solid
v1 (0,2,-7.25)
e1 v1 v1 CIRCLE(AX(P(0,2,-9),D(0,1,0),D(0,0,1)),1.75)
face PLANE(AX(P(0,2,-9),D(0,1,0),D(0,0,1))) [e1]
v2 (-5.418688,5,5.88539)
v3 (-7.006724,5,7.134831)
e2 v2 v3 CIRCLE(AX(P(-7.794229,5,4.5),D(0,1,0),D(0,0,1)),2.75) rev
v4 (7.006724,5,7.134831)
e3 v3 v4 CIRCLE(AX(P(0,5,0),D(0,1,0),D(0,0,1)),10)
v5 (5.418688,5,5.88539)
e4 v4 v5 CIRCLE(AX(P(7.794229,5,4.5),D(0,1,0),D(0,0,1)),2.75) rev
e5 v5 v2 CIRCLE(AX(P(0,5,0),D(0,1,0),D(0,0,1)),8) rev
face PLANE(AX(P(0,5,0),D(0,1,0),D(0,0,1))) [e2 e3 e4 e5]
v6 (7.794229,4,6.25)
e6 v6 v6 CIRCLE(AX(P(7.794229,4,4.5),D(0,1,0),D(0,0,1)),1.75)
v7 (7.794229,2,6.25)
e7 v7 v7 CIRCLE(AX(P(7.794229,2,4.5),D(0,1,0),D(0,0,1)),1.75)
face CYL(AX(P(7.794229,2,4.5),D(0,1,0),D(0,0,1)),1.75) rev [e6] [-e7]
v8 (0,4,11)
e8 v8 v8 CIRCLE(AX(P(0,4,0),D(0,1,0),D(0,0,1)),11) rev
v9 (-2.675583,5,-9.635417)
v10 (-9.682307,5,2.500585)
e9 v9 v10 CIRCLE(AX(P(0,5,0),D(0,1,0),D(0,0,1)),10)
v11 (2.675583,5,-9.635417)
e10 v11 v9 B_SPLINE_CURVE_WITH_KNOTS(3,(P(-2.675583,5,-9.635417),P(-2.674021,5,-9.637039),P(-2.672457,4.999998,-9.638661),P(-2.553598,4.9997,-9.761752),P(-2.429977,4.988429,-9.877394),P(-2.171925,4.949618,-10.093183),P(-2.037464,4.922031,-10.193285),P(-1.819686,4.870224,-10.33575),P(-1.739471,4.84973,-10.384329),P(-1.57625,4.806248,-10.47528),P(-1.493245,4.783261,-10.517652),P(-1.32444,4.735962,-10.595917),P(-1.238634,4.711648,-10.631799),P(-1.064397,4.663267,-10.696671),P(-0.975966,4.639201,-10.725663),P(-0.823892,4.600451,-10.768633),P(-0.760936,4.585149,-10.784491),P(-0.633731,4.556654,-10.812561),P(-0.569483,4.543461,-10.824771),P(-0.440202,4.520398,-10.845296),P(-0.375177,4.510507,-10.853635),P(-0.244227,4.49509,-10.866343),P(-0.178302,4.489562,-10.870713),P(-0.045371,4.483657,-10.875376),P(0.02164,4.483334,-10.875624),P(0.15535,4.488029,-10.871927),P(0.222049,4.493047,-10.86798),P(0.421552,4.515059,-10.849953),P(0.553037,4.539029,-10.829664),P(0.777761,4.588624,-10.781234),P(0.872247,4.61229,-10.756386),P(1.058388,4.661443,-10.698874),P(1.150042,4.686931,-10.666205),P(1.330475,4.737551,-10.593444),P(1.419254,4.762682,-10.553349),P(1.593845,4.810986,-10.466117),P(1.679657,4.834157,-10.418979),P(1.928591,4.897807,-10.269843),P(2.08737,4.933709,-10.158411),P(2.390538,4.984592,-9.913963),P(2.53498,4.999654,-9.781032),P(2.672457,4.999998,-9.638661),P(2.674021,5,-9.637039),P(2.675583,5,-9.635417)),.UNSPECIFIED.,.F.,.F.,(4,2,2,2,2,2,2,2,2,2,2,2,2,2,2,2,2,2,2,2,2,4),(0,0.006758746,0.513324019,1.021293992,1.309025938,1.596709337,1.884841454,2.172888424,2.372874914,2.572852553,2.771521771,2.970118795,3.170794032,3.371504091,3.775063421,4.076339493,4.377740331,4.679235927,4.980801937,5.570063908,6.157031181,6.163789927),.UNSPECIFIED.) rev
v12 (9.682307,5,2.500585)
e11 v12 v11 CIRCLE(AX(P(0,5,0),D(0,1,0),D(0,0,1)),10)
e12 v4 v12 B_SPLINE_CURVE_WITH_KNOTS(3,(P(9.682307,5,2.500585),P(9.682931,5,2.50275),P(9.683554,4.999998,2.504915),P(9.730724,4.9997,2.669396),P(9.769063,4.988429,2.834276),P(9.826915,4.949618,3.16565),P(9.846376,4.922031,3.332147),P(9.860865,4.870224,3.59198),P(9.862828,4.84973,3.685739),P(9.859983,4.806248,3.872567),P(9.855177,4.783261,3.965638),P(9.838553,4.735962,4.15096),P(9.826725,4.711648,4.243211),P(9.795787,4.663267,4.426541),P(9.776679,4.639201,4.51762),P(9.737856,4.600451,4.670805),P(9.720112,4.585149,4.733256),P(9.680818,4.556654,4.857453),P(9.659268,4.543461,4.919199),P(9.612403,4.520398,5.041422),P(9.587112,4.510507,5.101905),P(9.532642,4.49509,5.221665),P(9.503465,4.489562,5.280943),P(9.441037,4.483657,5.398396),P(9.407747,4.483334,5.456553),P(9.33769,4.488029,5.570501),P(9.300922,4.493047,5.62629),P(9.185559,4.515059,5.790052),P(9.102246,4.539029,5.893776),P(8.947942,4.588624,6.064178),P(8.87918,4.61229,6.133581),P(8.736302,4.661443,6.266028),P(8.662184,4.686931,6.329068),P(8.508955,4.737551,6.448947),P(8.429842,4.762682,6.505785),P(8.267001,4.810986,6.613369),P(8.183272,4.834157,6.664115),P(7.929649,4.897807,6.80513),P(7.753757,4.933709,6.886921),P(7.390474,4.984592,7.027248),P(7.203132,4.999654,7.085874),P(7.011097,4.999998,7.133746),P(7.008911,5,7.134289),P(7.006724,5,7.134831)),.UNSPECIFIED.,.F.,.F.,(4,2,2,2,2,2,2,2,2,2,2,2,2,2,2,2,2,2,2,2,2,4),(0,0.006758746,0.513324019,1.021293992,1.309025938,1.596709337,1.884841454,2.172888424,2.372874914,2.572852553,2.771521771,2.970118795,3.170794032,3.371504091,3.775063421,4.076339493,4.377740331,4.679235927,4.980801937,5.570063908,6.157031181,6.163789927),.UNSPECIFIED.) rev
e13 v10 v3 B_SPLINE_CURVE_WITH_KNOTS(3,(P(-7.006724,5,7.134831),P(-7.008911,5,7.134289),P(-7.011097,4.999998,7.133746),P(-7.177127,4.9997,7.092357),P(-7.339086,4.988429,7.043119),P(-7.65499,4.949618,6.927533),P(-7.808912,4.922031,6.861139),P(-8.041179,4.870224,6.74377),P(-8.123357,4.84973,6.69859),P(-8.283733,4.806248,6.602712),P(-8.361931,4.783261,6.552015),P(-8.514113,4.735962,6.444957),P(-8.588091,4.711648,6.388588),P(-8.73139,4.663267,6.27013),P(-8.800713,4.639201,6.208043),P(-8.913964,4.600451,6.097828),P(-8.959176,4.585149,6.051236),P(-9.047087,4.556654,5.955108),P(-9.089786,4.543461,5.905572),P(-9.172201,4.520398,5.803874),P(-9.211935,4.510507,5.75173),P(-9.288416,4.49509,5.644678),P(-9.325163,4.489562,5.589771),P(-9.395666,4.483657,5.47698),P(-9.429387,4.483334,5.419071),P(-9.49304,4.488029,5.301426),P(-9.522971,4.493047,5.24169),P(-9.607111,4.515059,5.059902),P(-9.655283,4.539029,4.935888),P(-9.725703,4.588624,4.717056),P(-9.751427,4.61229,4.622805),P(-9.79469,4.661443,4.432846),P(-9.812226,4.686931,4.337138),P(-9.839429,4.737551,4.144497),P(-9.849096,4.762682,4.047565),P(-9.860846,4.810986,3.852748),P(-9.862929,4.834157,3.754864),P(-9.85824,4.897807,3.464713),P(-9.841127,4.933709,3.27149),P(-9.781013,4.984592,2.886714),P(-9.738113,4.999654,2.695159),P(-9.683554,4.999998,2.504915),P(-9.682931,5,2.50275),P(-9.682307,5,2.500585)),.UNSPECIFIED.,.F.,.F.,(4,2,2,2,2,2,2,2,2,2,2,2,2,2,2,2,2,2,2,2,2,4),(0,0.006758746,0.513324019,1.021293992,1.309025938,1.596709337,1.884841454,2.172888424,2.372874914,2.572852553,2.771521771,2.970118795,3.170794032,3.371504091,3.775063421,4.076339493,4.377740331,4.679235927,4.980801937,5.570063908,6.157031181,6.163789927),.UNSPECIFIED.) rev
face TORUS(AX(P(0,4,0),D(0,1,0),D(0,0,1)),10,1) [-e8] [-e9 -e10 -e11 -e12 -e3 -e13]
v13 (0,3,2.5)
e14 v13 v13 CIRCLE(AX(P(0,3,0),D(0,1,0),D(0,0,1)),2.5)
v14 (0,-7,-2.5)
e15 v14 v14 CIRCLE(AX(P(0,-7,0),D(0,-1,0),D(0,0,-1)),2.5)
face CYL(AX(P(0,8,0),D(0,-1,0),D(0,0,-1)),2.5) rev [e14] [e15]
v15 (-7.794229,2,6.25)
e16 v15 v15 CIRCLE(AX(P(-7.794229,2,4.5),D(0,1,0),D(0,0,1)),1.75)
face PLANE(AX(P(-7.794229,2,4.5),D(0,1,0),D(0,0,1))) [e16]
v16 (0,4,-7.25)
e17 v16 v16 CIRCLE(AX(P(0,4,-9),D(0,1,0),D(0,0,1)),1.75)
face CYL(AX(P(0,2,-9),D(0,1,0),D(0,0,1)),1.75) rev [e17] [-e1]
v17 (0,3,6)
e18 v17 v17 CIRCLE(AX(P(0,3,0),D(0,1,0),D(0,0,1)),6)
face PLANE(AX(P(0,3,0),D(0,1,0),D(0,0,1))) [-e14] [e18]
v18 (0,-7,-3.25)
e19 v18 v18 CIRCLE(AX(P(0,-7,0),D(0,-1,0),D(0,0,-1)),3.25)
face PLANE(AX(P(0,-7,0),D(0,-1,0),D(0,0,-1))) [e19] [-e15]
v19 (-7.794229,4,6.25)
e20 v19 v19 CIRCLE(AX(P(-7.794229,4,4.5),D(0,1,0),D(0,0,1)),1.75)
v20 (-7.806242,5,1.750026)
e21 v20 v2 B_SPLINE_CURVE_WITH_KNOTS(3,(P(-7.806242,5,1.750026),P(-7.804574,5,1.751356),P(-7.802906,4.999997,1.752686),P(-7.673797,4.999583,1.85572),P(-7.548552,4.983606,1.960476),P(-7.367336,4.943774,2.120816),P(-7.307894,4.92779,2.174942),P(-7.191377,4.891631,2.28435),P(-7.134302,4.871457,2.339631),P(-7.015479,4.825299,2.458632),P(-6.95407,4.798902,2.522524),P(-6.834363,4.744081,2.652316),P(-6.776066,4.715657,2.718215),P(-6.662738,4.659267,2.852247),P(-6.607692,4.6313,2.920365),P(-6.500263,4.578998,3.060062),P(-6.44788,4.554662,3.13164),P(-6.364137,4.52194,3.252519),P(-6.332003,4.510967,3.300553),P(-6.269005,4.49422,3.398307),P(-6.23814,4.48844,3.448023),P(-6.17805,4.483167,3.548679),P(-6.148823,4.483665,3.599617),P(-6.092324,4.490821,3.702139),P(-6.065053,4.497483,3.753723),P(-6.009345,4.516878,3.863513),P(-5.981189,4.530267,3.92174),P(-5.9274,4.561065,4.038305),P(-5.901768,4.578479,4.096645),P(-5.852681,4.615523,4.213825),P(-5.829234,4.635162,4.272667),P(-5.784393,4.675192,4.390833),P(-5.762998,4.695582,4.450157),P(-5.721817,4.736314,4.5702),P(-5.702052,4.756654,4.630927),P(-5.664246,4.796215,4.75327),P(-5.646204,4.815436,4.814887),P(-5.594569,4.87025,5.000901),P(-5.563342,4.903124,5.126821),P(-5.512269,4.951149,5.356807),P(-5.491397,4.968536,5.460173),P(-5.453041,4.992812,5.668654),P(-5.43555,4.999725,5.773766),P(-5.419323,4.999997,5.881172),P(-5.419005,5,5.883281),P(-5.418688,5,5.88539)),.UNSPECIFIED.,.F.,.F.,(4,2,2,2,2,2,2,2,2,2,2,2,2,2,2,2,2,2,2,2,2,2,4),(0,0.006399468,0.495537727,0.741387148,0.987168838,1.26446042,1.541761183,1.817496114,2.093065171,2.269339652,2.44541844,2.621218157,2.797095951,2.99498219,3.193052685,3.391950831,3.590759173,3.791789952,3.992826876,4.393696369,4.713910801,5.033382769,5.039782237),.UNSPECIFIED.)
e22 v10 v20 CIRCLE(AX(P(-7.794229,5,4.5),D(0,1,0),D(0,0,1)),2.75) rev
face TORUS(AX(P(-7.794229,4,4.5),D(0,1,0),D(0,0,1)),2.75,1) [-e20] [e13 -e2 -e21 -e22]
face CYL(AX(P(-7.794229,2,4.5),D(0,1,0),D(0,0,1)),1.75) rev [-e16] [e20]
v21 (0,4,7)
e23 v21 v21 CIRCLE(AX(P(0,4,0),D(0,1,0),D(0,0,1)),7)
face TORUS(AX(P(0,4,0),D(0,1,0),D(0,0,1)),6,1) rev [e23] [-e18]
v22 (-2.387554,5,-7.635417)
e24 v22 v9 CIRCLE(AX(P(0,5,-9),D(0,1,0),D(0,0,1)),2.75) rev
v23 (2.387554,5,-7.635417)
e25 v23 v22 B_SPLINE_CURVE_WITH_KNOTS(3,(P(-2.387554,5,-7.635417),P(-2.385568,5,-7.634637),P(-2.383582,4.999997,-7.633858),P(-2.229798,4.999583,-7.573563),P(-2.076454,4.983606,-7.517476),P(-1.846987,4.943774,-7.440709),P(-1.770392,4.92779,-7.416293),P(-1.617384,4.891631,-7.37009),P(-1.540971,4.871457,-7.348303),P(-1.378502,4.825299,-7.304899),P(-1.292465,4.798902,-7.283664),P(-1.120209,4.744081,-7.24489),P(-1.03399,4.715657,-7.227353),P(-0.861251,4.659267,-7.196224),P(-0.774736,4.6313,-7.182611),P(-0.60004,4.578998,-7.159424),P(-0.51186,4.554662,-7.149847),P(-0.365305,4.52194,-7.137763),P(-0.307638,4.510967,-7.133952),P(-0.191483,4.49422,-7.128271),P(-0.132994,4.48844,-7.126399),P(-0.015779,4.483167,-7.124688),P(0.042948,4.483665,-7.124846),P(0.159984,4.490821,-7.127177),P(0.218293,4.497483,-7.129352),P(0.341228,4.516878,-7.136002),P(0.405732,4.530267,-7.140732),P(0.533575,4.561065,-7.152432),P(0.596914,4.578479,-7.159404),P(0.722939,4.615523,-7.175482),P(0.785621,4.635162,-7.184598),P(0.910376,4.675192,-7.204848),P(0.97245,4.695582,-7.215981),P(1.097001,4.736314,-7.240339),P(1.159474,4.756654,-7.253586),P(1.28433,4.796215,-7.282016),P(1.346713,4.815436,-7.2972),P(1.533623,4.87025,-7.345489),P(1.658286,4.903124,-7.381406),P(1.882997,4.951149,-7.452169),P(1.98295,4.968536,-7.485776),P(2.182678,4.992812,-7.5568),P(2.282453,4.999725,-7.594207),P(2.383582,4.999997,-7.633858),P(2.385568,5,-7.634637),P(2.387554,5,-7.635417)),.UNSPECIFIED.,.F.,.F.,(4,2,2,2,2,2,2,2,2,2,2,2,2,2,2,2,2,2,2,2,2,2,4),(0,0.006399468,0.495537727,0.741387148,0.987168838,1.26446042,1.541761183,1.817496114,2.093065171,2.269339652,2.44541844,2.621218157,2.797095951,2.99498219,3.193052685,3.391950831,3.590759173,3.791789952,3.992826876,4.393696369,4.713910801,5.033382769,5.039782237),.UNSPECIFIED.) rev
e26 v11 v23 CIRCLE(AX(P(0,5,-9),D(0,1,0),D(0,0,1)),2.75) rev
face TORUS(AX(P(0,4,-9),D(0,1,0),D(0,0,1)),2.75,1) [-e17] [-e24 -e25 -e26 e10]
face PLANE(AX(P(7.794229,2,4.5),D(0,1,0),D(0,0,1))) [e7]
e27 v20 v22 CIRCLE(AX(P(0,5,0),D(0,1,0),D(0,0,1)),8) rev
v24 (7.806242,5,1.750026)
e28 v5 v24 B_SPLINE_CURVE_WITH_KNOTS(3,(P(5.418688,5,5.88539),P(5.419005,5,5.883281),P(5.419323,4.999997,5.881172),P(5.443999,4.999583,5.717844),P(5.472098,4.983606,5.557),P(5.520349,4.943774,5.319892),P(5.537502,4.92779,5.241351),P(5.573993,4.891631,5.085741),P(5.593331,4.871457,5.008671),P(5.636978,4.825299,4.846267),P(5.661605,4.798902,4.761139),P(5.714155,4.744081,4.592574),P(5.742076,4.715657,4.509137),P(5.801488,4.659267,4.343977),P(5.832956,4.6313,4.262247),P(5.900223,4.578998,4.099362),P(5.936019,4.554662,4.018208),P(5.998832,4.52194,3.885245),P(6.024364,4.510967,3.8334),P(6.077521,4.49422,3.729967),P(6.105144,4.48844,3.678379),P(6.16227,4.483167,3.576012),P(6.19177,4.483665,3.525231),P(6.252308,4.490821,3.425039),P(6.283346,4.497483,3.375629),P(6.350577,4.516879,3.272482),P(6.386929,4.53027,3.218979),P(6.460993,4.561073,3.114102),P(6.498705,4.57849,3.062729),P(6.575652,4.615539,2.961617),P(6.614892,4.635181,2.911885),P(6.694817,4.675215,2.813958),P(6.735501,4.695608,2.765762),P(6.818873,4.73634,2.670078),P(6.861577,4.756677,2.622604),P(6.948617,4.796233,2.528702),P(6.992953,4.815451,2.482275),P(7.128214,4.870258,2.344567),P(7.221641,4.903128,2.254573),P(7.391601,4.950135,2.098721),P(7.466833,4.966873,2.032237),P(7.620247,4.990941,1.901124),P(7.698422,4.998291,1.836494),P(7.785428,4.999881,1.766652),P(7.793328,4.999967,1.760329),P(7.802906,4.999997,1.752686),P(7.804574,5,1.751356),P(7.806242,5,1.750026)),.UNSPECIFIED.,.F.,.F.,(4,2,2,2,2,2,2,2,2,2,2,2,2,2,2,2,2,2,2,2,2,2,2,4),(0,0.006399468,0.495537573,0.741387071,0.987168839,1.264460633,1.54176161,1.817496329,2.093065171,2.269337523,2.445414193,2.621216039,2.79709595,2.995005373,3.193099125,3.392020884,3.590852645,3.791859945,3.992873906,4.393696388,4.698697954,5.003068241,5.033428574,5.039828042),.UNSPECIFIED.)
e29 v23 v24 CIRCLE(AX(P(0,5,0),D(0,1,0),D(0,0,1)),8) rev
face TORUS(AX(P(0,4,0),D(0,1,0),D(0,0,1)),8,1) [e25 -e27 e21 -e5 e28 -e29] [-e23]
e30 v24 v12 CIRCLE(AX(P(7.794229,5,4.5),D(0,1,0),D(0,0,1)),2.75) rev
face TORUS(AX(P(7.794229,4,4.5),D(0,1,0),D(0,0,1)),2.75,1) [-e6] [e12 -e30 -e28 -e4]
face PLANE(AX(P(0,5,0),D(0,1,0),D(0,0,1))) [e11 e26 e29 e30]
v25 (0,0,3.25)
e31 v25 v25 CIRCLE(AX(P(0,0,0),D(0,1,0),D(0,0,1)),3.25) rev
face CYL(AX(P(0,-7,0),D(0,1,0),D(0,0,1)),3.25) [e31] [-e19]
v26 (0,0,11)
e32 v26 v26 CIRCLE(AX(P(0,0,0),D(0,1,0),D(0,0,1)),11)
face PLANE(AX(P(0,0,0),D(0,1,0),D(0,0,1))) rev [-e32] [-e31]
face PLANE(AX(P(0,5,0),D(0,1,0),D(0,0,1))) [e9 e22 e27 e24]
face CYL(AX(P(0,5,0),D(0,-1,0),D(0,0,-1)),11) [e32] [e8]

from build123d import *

# Parameters (mm, degrees)
SKETCH1_R           = 11
BOSS_EXTRUDE1_DEPTH = 5
SKETCH2_R           = 1.75
CUT_EXTRUDE1_DEPTH  = 3
SKETCH3_R           = 7
CUT_EXTRUDE2_DEPTH  = 2
SKETCH4_R           = 3.25
BOSS_EXTRUDE3_DEPTH = 7
SKETCH5_R           = 2.5
CUT_EXTRUDE3_DEPTH  = 15
FILLET3_R           = 1


with BuildPart() as part:
    # Sketch1 → Boss-Extrude1 (new body)
    with BuildSketch(Plane(origin=(0, 0, 0), x_dir=(1, 0, 0), z_dir=(0, 1, 0))):
        with Locations(Location((0, 0, 0), (0, 0, 270))):
            Circle(SKETCH1_R)
    extrude(amount=BOSS_EXTRUDE1_DEPTH)

    # Sketch2 → Cut-Extrude1 (cut)
    with BuildSketch(Plane(origin=(0, 5, 0), x_dir=(1, 0, 0), z_dir=(0, 1, 0))):
        with Locations(Location((0, 9, 0), (0, 0, 270))):
            Circle(SKETCH2_R)
        with Locations(Location((7.794228634, -4.5, 0), (0, 0, 270))):
            Circle(SKETCH2_R)
        with Locations(Location((-7.794228634, -4.5, 0), (0, 0, 270))):
            Circle(SKETCH2_R)
    extrude(amount=-CUT_EXTRUDE1_DEPTH, mode=Mode.SUBTRACT)

    # Sketch3 → Cut-Extrude2 (cut)
    with BuildSketch(Plane(origin=(0, 5, 0), x_dir=(1, 0, 0), z_dir=(0, 1, 0))):
        with Locations(Location((0, 0, 0), (0, 0, 270))):
            Circle(SKETCH3_R)
    extrude(amount=-CUT_EXTRUDE2_DEPTH, mode=Mode.SUBTRACT)

    # Sketch4 → Boss-Extrude3 (add)
    with BuildSketch(Plane.XZ):
        with Locations(Location((0, 0, 0), (0, 0, 90))):
            Circle(SKETCH4_R)
    extrude(amount=BOSS_EXTRUDE3_DEPTH)

    # Sketch5 → Cut-Extrude3 (cut)
    with BuildSketch(Plane.XZ.offset(7)):
        with Locations(Location((0, 0, 0), (0, 0, 270))):
            Circle(SKETCH5_R)
    extrude(amount=-CUT_EXTRUDE3_DEPTH, mode=Mode.SUBTRACT)

    # Fillet3
    # the kernel refuses this fillet: 1 mm, written as the material it adds along each edge
    with BuildSketch(Plane(origin=(0, 3, 0), x_dir=(0, 0, 1), z_dir=(-1, 0, 0))) as fillet3_piece_1:
        with BuildLine():
            CenterArc((7 - FILLET3_R, FILLET3_R), FILLET3_R, 270, 90)
            Line((7 - FILLET3_R, 0), (7, 0))
            Line((7, 0), (7, FILLET3_R))
        make_face()
    revolve(axis=Axis((0, 3, 0), (0, 1, 0)))
    # the kernel refuses this fillet: 1 mm, written as the material it takes off along each edge
    with BuildSketch(Plane(origin=(-7.794228634, 5, 4.5), x_dir=(0, 0, 1), z_dir=(-1, 0, 0))) as fillet3_2_piece_1:
        with BuildLine():
            CenterArc((1.75 + FILLET3_R, -FILLET3_R), FILLET3_R, 90, 90)
            Line((1.75, -FILLET3_R), (1.75, 0))
            Line((1.75, 0), (1.75 + FILLET3_R, 0))
        make_face()
    revolve(axis=Axis((-7.794228634, 5, 4.5), (0, 1, 0)), mode=Mode.SUBTRACT)
    with BuildSketch(Plane(origin=(0, 5, 0), x_dir=(0, 0, 1), z_dir=(-1, 0, 0))) as fillet3_2_piece_2:
        with BuildLine():
            CenterArc((7 + FILLET3_R, -FILLET3_R), FILLET3_R, 90, 90)
            Line((7, -FILLET3_R), (7, 0))
            Line((7, 0), (7 + FILLET3_R, 0))
        make_face()
    revolve(axis=Axis((0, 5, 0), (0, 1, 0)), mode=Mode.SUBTRACT)
    with BuildSketch(Plane(origin=(0, 5, 0), x_dir=(0, 0, 1), z_dir=(-1, 0, 0))) as fillet3_2_piece_3:
        with BuildLine():
            CenterArc((11 - FILLET3_R, -FILLET3_R), FILLET3_R, 0, 90)
            Line((11 - FILLET3_R, 0), (11, 0))
            Line((11, 0), (11, -FILLET3_R))
        make_face()
    revolve(axis=Axis((0, 5, 0), (0, 1, 0)), mode=Mode.SUBTRACT)
    with BuildSketch(Plane(origin=(0, 5, -9), x_dir=(0, 0, 1), z_dir=(-1, 0, 0))) as fillet3_2_piece_4:
        with BuildLine():
            CenterArc((1.75 + FILLET3_R, -FILLET3_R), FILLET3_R, 90, 90)
            Line((1.75, -FILLET3_R), (1.75, 0))
            Line((1.75, 0), (1.75 + FILLET3_R, 0))
        make_face()
    revolve(axis=Axis((0, 5, -9), (0, 1, 0)), mode=Mode.SUBTRACT)
    with BuildSketch(Plane(origin=(7.794228634, 5, 4.5), x_dir=(0, 0, 1), z_dir=(-1, 0, 0))) as fillet3_2_piece_5:
        with BuildLine():
            CenterArc((1.75 + FILLET3_R, -FILLET3_R), FILLET3_R, 90, 90)
            Line((1.75, -FILLET3_R), (1.75, 0))
            Line((1.75, 0), (1.75 + FILLET3_R, 0))
        make_face()
    revolve(axis=Axis((7.794228634, 5, 4.5), (0, 1, 0)), mode=Mode.SUBTRACT)


solid = part.part
